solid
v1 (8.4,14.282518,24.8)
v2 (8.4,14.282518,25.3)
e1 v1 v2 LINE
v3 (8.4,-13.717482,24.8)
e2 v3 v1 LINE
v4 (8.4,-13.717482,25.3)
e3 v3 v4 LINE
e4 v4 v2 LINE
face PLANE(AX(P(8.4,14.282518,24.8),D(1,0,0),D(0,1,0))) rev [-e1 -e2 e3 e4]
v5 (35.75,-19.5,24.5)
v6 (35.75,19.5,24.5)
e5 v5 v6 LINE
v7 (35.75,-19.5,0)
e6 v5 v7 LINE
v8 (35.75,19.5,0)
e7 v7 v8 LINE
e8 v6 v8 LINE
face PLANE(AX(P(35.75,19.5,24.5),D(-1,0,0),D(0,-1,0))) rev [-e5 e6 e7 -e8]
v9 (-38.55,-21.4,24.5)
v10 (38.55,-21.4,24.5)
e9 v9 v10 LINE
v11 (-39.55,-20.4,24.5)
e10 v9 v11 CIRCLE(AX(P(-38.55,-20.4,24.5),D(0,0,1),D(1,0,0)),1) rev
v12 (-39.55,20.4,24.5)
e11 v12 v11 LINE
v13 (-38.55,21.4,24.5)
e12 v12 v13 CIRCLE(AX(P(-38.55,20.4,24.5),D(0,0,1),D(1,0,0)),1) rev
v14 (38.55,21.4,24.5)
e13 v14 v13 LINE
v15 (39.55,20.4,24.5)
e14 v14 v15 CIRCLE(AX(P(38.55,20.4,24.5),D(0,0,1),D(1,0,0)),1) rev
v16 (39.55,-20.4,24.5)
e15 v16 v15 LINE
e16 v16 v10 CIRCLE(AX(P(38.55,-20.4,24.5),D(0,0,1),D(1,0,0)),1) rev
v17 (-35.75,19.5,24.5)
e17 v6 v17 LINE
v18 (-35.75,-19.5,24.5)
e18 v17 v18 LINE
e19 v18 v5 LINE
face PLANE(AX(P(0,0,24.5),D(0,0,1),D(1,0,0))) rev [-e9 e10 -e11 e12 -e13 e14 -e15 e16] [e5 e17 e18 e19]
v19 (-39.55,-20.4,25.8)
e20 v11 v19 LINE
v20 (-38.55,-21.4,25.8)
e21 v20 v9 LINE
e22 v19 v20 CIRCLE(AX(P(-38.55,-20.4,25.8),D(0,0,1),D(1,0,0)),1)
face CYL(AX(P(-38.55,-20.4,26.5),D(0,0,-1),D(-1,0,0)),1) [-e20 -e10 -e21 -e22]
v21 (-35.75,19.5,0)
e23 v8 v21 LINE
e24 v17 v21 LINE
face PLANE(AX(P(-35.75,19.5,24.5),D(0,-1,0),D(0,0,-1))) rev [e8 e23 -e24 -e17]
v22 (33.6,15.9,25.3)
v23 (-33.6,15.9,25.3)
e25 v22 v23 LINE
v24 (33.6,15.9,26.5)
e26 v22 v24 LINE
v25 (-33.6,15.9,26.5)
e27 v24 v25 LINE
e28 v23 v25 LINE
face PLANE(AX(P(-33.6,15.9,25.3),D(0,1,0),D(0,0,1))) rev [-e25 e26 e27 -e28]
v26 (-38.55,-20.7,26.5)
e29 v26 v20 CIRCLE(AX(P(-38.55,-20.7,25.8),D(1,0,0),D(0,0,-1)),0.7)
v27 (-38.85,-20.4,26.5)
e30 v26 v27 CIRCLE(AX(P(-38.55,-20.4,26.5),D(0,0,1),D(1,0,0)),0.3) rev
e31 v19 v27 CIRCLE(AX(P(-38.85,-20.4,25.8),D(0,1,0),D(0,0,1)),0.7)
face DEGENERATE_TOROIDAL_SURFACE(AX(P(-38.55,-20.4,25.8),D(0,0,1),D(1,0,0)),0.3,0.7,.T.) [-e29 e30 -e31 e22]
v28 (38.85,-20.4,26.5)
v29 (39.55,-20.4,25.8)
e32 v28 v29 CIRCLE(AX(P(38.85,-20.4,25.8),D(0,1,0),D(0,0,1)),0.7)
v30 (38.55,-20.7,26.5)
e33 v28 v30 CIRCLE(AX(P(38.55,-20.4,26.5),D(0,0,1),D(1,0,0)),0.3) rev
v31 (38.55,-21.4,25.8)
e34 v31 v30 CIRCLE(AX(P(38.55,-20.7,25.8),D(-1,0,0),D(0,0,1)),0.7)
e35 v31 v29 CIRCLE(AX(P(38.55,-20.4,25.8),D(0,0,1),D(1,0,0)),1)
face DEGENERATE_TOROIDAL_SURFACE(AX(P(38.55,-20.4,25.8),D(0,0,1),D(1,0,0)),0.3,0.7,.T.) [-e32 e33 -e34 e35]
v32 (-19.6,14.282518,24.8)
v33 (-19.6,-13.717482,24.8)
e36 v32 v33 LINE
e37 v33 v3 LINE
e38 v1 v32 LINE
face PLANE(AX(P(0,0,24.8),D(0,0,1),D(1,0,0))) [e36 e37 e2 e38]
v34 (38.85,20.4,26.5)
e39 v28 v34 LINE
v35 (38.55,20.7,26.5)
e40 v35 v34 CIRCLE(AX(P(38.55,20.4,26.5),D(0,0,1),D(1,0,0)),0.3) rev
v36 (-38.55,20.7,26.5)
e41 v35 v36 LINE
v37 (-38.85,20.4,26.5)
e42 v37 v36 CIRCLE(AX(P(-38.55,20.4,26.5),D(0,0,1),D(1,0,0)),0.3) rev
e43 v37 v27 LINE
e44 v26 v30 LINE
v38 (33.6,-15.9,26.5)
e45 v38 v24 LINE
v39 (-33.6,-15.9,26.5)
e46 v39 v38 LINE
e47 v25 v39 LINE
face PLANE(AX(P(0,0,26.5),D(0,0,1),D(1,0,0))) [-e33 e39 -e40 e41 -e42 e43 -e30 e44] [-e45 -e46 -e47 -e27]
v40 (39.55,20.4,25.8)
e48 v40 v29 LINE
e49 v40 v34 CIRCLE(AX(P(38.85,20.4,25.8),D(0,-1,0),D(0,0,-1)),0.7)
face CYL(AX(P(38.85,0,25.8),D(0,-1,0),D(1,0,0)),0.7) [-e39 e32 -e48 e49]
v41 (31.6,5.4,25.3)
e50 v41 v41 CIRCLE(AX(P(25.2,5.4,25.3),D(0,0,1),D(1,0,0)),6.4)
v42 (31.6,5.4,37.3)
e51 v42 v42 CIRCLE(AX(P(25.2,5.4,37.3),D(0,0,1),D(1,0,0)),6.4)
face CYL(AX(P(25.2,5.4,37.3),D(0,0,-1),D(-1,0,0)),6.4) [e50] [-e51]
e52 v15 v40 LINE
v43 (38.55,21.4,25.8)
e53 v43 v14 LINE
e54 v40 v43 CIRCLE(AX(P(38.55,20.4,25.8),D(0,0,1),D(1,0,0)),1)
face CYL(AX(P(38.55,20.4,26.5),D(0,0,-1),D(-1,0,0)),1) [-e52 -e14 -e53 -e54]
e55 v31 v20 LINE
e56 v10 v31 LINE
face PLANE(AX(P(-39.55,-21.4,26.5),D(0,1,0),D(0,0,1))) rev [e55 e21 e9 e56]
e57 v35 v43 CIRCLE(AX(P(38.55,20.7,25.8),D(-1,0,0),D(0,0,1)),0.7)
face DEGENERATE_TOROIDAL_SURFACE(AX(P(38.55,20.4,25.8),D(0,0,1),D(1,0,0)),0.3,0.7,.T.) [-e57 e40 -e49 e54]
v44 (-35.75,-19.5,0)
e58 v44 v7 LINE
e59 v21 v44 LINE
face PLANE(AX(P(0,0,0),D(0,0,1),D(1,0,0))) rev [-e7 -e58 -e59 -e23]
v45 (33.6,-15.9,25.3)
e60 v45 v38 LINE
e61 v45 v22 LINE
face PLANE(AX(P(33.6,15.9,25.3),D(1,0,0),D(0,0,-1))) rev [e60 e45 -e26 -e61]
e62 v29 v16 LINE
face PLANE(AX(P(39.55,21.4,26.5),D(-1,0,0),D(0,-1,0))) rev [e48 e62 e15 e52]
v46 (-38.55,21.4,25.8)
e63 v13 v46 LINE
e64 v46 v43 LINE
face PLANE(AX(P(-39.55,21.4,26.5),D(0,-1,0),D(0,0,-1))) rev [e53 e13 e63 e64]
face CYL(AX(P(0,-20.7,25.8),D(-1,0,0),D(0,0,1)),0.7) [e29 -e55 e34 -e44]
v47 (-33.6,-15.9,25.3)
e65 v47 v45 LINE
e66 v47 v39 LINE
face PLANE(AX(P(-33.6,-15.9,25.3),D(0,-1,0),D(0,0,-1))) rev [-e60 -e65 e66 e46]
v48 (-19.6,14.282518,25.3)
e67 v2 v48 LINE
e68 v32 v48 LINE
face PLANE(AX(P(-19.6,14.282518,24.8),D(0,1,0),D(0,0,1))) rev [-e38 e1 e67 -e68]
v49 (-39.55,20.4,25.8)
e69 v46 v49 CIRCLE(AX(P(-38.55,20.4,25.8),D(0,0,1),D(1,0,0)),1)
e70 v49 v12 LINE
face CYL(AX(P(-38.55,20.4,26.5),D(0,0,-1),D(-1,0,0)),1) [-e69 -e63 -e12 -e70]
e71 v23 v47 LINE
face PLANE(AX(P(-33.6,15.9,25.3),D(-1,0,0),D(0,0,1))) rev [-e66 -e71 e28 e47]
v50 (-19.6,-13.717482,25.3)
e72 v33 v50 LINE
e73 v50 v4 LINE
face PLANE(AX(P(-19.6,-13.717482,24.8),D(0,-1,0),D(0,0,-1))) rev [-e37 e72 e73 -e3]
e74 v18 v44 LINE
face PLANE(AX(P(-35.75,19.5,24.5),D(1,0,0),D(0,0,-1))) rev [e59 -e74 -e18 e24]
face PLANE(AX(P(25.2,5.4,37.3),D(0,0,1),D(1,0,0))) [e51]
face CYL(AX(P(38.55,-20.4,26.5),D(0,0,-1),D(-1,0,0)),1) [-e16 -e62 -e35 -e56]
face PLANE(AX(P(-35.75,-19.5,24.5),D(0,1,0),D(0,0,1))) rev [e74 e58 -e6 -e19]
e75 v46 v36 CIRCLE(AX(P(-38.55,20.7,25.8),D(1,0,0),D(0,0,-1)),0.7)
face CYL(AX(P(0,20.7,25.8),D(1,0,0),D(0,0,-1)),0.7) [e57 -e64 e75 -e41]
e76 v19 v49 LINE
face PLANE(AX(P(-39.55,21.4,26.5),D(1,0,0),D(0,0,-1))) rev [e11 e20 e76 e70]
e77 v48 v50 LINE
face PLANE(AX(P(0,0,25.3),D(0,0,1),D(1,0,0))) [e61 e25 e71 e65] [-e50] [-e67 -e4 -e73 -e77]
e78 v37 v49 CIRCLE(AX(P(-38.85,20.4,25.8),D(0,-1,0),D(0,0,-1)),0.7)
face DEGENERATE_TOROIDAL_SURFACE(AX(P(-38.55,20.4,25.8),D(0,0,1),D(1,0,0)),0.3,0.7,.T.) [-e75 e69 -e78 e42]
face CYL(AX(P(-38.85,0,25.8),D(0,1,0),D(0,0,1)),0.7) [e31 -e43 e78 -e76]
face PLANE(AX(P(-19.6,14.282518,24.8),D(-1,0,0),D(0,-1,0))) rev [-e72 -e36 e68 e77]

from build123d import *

# Parameters (mm, degrees)
SKETCH_1_W          = 71.5
SKETCH_1_H          = 39
EXTRUDE_1_DEPTH     = 24.5
SKETCH_2_W          = 79.1
SKETCH_2_H          = 42.8
EXTRUDE_2_DEPTH     = 2
FILLET_1_R          = 0.7
FILLET_2_R          = 1
SKETCH_3_W          = 67.2
SKETCH_3_H          = 31.8
CUT_EXTRUDE_1_DEPTH = 1.2
SKETCH_4_R          = 6.4
EXTRUDE_3_DEPTH     = 12
SKETCH_5_W          = 28
SKETCH_5_H          = 28
CUT_EXTRUDE_2_DEPTH = 0.5


with BuildPart() as part:
    # Эскиз1 → Бобышка-Вытянуть1 (new body)
    with BuildSketch(Plane.XY):
        Rectangle(SKETCH_1_W, SKETCH_1_H)
    extrude(amount=EXTRUDE_1_DEPTH)

    # Эскиз2 → Бобышка-Вытянуть2 (add)
    with BuildSketch(Plane.XY.offset(24.5)):
        Rectangle(SKETCH_2_W, SKETCH_2_H)
    extrude(amount=EXTRUDE_2_DEPTH)

    # Скругление1
    fillet_1_edges = [part.edges().sort_by_distance(p)[0] for p in [
        (39.55, 0, 26.5),
        (0, 21.4, 26.5),
        (-39.55, 0, 26.5),
        (0, -21.4, 26.5),
    ]]
    fillet(fillet_1_edges, radius=FILLET_1_R)

    # Скругление2
    # the kernel refuses this fillet: 1 mm, written as the material it takes off along each edge
    with BuildSketch(Plane(origin=(-38.55, 20.4, 26.5), x_dir=(0, 1, 0), z_dir=(1, 0, 0))) as fillet_2_piece_1:
        with BuildLine():
            CenterArc((0.3, -0.7), 0.7, 0, 90)
            Line((1, -0.7), (1, 0))
            Line((1, 0), (0.3, 0))
        make_face()
    revolve(axis=Axis((-38.55, 20.4, 26.5), (0, 0, 1)), revolution_arc=90, mode=Mode.SUBTRACT)
    with BuildSketch(Plane(origin=(38.55, 20.4, 26.5), x_dir=(1, 0, 0), z_dir=(0, -1, 0))) as fillet_2_piece_2:
        with BuildLine():
            CenterArc((0.3, -0.7), 0.7, 0, 90)
            Line((1, -0.7), (1, 0))
            Line((1, 0), (0.3, 0))
        make_face()
    revolve(axis=Axis((38.55, 20.4, 26.5), (0, 0, 1)), revolution_arc=90, mode=Mode.SUBTRACT)
    with BuildSketch(Plane(origin=(-38.55, -20.4, 26.5), x_dir=(-1, 0, 0), z_dir=(0, 1, 0))) as fillet_2_piece_3:
        with BuildLine():
            CenterArc((0.3, -0.7), 0.7, 0, 90)
            Line((1, -0.7), (1, 0))
            Line((1, 0), (0.3, 0))
        make_face()
    revolve(axis=Axis((-38.55, -20.4, 26.5), (0, 0, 1)), revolution_arc=90, mode=Mode.SUBTRACT)
    with BuildSketch(Plane(origin=(38.55, -20.4, 26.5), x_dir=(0, -1, 0), z_dir=(-1, 0, 0))) as fillet_2_piece_4:
        with BuildLine():
            CenterArc((0.3, -0.7), 0.7, 0, 90)
            Line((1, -0.7), (1, 0))
            Line((1, 0), (0.3, 0))
        make_face()
    revolve(axis=Axis((38.55, -20.4, 26.5), (0, 0, 1)), revolution_arc=90, mode=Mode.SUBTRACT)
    with BuildSketch(Plane(origin=(39.55, -21.4, 22), x_dir=(0, 1, 0), z_dir=(0, 0, 1)), Plane(origin=(39.55, 21.4, 22), x_dir=(-1, 0, 0), z_dir=(0, 0, 1))) as fillet_2_piece_5:
        with BuildLine():
            CenterArc((FILLET_2_R, FILLET_2_R), FILLET_2_R, 180, 90)
            Line((0, FILLET_2_R), (0, 0))
            Line((0, 0), (FILLET_2_R, 0))
        make_face()
    extrude(amount=4.5, mode=Mode.SUBTRACT)
    with BuildSketch(Plane(origin=(-39.55, -21.4, 22), x_dir=(0, 1, 0), z_dir=(0, 0, 1)), Plane(origin=(-39.55, 21.4, 22), x_dir=(1, 0, 0), z_dir=(0, 0, 1))) as fillet_2_piece_6:
        with BuildLine():
            CenterArc((FILLET_2_R, -FILLET_2_R), FILLET_2_R, 90, 90)
            Line((0, -FILLET_2_R), (0, 0))
            Line((0, 0), (FILLET_2_R, 0))
        make_face()
    extrude(amount=4.5, mode=Mode.SUBTRACT)

    # Эскиз3 → Вырез-Вытянуть1 (cut)
    with BuildSketch(Plane.XY.offset(26.5)):
        Rectangle(SKETCH_3_W, SKETCH_3_H)
    extrude(amount=-CUT_EXTRUDE_1_DEPTH, mode=Mode.SUBTRACT)

    # Эскиз4 → Бобышка-Вытянуть3 (add)
    with BuildSketch(Plane.XY.offset(25.3)):
        with Locations((25.2, 5.4)):
            Circle(SKETCH_4_R)
    extrude(amount=EXTRUDE_3_DEPTH)

    # Эскиз5 → Вырез-Вытянуть2 (cut)
    with BuildSketch(Plane.XY.offset(25.3)):
        with Locations((-5.6, 0.282517759)):
            Rectangle(SKETCH_5_W, SKETCH_5_H)
    extrude(amount=-CUT_EXTRUDE_2_DEPTH, mode=Mode.SUBTRACT)


solid = part.part
